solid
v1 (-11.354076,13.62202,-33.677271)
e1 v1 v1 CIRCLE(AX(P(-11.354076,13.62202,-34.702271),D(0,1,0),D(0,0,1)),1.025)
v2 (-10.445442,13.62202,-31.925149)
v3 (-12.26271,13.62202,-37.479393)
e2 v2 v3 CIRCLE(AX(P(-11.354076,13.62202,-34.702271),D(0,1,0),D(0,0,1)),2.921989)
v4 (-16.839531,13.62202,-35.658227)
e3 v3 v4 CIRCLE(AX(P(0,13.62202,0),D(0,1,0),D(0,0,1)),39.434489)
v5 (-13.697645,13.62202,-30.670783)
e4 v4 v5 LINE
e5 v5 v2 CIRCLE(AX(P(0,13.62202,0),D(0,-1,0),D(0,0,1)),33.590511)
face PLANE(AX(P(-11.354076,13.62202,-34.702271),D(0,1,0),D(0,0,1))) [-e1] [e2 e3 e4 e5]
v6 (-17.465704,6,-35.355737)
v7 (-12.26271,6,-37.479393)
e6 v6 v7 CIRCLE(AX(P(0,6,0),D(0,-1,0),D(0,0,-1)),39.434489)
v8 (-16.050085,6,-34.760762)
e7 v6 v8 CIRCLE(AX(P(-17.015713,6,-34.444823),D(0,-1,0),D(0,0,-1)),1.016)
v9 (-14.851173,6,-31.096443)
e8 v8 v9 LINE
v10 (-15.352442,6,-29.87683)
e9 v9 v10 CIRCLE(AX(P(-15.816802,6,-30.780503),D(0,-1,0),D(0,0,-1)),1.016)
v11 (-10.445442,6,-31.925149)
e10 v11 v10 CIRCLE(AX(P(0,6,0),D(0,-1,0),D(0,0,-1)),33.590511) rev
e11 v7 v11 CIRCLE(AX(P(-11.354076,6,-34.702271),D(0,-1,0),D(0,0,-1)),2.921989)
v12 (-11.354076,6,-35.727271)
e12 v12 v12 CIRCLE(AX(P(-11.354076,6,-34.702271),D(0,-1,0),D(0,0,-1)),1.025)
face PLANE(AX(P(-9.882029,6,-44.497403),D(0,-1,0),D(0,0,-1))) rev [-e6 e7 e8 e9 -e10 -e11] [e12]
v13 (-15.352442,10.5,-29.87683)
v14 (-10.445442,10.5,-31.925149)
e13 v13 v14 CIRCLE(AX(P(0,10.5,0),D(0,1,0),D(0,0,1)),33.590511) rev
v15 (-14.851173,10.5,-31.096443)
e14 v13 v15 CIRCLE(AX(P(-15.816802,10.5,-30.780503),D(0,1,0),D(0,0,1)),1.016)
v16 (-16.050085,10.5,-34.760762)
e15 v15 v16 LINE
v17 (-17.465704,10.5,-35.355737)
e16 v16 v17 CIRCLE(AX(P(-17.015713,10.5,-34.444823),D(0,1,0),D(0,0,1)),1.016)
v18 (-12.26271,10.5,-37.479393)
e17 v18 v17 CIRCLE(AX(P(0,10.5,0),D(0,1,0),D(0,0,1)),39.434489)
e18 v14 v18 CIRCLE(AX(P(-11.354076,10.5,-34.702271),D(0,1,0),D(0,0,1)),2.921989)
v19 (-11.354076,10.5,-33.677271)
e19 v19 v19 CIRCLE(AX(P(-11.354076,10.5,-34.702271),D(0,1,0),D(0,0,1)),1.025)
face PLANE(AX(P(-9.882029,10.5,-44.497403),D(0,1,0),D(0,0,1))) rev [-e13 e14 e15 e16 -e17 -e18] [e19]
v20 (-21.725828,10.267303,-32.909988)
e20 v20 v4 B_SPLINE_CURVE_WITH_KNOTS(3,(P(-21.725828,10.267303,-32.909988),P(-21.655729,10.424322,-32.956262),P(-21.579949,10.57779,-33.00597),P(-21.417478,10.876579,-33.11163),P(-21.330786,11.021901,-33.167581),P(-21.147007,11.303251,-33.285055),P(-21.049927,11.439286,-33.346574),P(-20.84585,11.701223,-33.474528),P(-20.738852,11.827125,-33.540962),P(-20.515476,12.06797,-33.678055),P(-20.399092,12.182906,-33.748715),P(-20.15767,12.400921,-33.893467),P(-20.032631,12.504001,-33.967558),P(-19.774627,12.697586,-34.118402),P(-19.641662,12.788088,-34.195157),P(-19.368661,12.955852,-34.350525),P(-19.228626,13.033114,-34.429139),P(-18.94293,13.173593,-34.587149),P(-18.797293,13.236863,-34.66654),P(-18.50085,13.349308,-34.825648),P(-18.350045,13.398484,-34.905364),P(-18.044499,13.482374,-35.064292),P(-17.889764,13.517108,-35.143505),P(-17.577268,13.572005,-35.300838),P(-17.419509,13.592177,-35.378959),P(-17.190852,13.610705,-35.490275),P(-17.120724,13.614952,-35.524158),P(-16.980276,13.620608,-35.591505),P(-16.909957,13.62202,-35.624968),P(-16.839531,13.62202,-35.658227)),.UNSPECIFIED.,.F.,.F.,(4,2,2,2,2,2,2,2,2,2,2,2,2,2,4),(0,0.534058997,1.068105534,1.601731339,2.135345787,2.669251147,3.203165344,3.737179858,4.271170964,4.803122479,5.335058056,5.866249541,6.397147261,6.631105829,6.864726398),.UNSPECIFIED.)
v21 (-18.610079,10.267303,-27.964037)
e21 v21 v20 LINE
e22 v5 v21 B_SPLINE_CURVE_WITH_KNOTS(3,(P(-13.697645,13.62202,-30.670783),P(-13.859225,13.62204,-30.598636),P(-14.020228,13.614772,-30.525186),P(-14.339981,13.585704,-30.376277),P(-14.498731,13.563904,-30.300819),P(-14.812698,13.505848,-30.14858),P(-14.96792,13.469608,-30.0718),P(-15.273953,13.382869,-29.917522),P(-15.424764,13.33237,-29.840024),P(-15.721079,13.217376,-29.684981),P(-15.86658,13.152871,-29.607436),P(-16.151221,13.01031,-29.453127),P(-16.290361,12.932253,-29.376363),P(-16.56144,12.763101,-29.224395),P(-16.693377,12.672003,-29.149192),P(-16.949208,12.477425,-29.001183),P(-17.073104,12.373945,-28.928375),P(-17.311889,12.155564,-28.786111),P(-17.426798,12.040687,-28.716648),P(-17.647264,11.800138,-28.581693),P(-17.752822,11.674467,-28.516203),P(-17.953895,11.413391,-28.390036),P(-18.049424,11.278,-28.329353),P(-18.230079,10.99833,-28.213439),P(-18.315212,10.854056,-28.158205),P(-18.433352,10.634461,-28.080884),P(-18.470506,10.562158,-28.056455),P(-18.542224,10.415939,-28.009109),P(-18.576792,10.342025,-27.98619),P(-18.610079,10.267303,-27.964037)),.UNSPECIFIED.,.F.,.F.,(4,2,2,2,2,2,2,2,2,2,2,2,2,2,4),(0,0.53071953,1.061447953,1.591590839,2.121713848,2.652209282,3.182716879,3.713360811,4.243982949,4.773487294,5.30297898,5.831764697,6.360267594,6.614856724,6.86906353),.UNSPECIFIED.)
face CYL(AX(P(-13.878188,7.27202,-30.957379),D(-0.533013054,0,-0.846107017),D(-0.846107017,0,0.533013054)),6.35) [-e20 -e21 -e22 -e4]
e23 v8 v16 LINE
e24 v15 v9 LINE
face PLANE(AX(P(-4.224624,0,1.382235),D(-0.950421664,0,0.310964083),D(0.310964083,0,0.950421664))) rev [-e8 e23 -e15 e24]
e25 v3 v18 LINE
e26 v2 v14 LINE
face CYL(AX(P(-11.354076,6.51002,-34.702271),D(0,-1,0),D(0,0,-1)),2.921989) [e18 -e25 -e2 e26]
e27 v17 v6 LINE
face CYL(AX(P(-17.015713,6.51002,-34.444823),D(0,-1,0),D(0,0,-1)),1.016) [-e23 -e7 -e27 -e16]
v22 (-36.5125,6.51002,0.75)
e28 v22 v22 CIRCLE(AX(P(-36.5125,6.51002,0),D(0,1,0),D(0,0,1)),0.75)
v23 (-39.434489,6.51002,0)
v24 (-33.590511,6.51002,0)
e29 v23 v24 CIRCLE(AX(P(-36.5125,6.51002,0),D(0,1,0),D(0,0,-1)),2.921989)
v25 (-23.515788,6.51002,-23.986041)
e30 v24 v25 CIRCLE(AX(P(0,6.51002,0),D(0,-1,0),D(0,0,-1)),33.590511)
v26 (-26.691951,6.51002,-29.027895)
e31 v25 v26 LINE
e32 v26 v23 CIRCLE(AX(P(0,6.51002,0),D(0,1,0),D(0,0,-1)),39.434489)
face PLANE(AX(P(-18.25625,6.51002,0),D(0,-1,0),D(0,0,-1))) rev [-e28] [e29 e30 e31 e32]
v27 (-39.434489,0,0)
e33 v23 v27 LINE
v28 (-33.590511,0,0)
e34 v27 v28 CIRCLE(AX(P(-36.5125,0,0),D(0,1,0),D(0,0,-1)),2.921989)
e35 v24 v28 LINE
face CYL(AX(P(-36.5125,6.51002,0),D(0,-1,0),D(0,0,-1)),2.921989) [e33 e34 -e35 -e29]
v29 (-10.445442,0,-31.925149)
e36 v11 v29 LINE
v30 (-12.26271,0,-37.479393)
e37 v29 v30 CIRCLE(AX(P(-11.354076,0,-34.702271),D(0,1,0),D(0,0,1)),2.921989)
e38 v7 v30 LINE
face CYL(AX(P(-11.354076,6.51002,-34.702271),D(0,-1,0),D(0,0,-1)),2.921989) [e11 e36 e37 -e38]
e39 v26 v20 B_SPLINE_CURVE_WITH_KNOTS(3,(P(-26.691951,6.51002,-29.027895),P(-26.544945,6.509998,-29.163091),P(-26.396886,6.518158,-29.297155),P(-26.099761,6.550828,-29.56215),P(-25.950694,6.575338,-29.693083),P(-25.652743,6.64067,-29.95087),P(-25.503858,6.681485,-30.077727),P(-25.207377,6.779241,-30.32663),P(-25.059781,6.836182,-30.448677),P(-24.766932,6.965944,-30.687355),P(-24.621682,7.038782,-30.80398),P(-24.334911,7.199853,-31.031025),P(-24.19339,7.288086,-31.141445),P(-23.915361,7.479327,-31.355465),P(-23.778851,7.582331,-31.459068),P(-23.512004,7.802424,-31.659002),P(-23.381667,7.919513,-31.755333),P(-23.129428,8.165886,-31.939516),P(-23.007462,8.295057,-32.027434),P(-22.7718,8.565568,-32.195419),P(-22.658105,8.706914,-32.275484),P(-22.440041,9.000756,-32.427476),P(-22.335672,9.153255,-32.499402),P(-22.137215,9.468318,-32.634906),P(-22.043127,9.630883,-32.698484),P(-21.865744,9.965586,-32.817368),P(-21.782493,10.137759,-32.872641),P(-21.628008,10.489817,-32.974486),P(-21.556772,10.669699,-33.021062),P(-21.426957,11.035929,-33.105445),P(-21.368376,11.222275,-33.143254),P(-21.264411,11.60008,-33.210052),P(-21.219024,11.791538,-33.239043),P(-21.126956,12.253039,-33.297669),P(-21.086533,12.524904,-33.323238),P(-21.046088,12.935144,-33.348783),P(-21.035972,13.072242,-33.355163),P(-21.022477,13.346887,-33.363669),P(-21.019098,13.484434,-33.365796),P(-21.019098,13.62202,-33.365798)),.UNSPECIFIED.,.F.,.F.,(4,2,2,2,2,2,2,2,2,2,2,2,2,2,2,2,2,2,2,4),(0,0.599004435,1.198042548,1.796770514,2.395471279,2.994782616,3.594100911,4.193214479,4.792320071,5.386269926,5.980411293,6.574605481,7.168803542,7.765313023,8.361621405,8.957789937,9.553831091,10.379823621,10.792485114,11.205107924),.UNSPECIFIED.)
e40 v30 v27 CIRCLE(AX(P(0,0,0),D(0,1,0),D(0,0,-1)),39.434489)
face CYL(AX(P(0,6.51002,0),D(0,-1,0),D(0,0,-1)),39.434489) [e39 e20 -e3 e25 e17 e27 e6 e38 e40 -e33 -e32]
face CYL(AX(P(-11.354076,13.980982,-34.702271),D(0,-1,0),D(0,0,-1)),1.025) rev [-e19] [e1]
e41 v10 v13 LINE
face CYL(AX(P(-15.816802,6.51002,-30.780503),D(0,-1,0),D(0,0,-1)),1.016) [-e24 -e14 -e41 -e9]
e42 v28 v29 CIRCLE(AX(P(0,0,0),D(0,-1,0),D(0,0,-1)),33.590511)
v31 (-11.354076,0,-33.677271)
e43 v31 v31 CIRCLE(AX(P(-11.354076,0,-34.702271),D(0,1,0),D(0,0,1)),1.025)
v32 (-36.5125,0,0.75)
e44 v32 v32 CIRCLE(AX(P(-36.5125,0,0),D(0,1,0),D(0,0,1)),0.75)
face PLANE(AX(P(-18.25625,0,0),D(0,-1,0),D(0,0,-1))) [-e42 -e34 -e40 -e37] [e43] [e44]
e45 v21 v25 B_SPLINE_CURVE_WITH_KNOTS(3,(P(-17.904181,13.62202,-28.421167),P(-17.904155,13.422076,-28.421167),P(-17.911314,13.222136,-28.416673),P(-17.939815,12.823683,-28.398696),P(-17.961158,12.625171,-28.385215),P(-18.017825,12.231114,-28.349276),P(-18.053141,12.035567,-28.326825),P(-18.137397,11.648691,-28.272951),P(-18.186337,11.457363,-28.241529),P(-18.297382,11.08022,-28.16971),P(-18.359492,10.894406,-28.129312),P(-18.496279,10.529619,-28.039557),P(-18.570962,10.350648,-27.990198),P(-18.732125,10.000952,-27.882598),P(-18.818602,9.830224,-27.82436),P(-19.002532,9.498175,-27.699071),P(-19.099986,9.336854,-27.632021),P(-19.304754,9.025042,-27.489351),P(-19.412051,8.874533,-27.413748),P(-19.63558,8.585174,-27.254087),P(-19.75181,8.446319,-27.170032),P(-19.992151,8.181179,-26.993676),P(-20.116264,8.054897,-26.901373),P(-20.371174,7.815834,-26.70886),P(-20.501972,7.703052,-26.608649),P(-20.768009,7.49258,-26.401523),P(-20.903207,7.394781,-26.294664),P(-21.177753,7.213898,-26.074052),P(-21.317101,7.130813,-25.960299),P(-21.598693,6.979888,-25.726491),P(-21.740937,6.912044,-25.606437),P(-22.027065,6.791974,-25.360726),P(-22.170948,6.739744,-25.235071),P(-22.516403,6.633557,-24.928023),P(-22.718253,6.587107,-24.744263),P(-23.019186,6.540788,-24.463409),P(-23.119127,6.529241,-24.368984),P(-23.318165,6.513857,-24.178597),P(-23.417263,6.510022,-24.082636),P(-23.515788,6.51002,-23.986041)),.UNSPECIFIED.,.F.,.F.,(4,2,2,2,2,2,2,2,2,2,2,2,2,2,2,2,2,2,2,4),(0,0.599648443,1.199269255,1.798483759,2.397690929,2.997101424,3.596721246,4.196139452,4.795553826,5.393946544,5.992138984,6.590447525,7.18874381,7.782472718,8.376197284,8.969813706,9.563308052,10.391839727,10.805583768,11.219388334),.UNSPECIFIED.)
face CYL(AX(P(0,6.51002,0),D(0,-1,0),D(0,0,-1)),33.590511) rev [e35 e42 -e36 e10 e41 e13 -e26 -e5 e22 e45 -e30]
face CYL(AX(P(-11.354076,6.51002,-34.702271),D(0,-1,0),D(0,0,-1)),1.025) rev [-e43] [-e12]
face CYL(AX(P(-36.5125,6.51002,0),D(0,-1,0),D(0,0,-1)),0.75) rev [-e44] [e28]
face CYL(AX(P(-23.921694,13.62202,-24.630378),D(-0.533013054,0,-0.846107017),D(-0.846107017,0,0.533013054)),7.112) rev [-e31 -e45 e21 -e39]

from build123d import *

# Parameters (mm, degrees)
SKETCH1_R               = 0.7499999999999986
SKETCH1_R_2             = 1.0249999999999995
BOSS_EXTRUDE1_DEPTH     = 6.510019999999999
BOSS_EXTRU_1_DEPTH      = 7.112
CONG_1_R                = 7.112
CONG_2_R                = 6.35
ENL_V_MAT_EXTRU_1_DEPTH = 4.444999999999999
ESQUISSE4_R             = 1.024999999999998
ENL_V_MAT_EXTRU_2_DEPTH = 57.18027536353634
CONG_3_R                = 1.016


with BuildPart() as part:
    # Sketch1 → Boss-Extrude1 (new body)
    with BuildSketch(Plane(origin=(0, 0, 0), x_dir=(1, 0, 0), z_dir=(0, 1, 0))):
        with BuildLine():
            ThreePointArc((-33.59051080682659, 0), (-27.195497439499345, 19.716169386615615), (-10.445442396451748, 31.92514916810793))
            ThreePointArc((-10.445442396451748, 31.92514916810793), (-8.576954256445317, 35.61090468912391), (-12.262709777461287, 37.4793928291303))
            ThreePointArc((-12.262709777461287, 37.4793928291303), (-31.926890187777666, 23.14633061338439), (-39.43448919317339, 0))
            ThreePointArc((-39.43448919317339, 0), (-36.512499999999996, -2.9219891931734026), (-33.59051080682659, 0))
        make_face()
        with Locations(Location((-36.512499999999996, 0, 0), (0, 0, 270))):
            Circle(SKETCH1_R, mode=Mode.SUBTRACT)
        with Locations(Location((-11.354076086956523, 34.702270998619134, 0), (0, 0, 270))):
            Circle(SKETCH1_R_2, mode=Mode.SUBTRACT)
    extrude(amount=BOSS_EXTRUDE1_DEPTH)

    # Esquisse1 → Boss.-Extru.1 (add)
    with BuildSketch(Plane(origin=(0, 6.510019999999999, 0), x_dir=(1, 0, 0), z_dir=(0, 1, 0))):
        with BuildLine():
            Line((-17.904180753250905, 28.421166897551096), (-21.0190975209346, 33.36579801731034))
            ThreePointArc((-21.0190975209346, 33.36579801731034), (-16.767530820930304, 35.69213986434075), (-12.262709777461293, 37.47939282913032))
            ThreePointArc((-12.262709777461293, 37.47939282913032), (-8.576954256445317, 35.610904689123906), (-10.44544239645175, 31.92514916810793))
            ThreePointArc((-10.44544239645175, 31.92514916810793), (-14.282673283409979, 30.40275744308238), (-17.904180753250905, 28.421166897551096))
        make_face()
    extrude(amount=BOSS_EXTRU_1_DEPTH)

    # Congé1
    cong_1_edges = [part.edges().sort_by_distance(p)[0] for p in [
        (-19.461639137092753, 6.510019999999999, -30.893482457430718),
    ]]
    fillet(cong_1_edges, radius=CONG_1_R - 0.0001)  # a hair under: the kernel refuses the full size

    # Congé2
    cong_2_edges = [part.edges().sort_by_distance(p)[0] for p in [
        (-19.461639137092753, 13.62202, -30.893482457430718),
    ]]
    fillet(cong_2_edges, radius=CONG_2_R)

    # Esquisse3 → Enlèv. mat.-Extru.1 (cut, symmetric)
    with BuildSketch(Plane(origin=(-12.262709777461295, 0, -37.479392829130326), x_dir=(0.3109640831758033, 0, 0.9504216637759433), z_dir=(-0.9504216637759433, 0, 0.3109640831758033))):
        Polygon((-5.92976249492949, 10.499999999999998), (8.153118343955157, 10.499999999999998), (8.153118343955159, 6), (-5.92976249492949, 6), align=None)
    extrude(amount=ENL_V_MAT_EXTRU_1_DEPTH, both=True, mode=Mode.SUBTRACT)

    # Esquisse4 → Enlèv. mat.-Extru.2 (cut, through all)
    with BuildSketch(Plane.XZ):
        with Locations(Location((-11.354076086956523, -34.702270998619134, 0), (0, 0, 270))):
            Circle(ESQUISSE4_R)
    extrude(amount=-ENL_V_MAT_EXTRU_2_DEPTH, mode=Mode.SUBTRACT)

    # Congé3
    cong_3_edges = [part.edges().sort_by_distance(p)[0] for p in [
        (-16.409183233920817, 8.25, -35.85829950683831),
        (-14.578207843975182, 8.25, -30.262159082282853),
    ]]
    fillet(cong_3_edges, radius=CONG_3_R)


solid = part.part
